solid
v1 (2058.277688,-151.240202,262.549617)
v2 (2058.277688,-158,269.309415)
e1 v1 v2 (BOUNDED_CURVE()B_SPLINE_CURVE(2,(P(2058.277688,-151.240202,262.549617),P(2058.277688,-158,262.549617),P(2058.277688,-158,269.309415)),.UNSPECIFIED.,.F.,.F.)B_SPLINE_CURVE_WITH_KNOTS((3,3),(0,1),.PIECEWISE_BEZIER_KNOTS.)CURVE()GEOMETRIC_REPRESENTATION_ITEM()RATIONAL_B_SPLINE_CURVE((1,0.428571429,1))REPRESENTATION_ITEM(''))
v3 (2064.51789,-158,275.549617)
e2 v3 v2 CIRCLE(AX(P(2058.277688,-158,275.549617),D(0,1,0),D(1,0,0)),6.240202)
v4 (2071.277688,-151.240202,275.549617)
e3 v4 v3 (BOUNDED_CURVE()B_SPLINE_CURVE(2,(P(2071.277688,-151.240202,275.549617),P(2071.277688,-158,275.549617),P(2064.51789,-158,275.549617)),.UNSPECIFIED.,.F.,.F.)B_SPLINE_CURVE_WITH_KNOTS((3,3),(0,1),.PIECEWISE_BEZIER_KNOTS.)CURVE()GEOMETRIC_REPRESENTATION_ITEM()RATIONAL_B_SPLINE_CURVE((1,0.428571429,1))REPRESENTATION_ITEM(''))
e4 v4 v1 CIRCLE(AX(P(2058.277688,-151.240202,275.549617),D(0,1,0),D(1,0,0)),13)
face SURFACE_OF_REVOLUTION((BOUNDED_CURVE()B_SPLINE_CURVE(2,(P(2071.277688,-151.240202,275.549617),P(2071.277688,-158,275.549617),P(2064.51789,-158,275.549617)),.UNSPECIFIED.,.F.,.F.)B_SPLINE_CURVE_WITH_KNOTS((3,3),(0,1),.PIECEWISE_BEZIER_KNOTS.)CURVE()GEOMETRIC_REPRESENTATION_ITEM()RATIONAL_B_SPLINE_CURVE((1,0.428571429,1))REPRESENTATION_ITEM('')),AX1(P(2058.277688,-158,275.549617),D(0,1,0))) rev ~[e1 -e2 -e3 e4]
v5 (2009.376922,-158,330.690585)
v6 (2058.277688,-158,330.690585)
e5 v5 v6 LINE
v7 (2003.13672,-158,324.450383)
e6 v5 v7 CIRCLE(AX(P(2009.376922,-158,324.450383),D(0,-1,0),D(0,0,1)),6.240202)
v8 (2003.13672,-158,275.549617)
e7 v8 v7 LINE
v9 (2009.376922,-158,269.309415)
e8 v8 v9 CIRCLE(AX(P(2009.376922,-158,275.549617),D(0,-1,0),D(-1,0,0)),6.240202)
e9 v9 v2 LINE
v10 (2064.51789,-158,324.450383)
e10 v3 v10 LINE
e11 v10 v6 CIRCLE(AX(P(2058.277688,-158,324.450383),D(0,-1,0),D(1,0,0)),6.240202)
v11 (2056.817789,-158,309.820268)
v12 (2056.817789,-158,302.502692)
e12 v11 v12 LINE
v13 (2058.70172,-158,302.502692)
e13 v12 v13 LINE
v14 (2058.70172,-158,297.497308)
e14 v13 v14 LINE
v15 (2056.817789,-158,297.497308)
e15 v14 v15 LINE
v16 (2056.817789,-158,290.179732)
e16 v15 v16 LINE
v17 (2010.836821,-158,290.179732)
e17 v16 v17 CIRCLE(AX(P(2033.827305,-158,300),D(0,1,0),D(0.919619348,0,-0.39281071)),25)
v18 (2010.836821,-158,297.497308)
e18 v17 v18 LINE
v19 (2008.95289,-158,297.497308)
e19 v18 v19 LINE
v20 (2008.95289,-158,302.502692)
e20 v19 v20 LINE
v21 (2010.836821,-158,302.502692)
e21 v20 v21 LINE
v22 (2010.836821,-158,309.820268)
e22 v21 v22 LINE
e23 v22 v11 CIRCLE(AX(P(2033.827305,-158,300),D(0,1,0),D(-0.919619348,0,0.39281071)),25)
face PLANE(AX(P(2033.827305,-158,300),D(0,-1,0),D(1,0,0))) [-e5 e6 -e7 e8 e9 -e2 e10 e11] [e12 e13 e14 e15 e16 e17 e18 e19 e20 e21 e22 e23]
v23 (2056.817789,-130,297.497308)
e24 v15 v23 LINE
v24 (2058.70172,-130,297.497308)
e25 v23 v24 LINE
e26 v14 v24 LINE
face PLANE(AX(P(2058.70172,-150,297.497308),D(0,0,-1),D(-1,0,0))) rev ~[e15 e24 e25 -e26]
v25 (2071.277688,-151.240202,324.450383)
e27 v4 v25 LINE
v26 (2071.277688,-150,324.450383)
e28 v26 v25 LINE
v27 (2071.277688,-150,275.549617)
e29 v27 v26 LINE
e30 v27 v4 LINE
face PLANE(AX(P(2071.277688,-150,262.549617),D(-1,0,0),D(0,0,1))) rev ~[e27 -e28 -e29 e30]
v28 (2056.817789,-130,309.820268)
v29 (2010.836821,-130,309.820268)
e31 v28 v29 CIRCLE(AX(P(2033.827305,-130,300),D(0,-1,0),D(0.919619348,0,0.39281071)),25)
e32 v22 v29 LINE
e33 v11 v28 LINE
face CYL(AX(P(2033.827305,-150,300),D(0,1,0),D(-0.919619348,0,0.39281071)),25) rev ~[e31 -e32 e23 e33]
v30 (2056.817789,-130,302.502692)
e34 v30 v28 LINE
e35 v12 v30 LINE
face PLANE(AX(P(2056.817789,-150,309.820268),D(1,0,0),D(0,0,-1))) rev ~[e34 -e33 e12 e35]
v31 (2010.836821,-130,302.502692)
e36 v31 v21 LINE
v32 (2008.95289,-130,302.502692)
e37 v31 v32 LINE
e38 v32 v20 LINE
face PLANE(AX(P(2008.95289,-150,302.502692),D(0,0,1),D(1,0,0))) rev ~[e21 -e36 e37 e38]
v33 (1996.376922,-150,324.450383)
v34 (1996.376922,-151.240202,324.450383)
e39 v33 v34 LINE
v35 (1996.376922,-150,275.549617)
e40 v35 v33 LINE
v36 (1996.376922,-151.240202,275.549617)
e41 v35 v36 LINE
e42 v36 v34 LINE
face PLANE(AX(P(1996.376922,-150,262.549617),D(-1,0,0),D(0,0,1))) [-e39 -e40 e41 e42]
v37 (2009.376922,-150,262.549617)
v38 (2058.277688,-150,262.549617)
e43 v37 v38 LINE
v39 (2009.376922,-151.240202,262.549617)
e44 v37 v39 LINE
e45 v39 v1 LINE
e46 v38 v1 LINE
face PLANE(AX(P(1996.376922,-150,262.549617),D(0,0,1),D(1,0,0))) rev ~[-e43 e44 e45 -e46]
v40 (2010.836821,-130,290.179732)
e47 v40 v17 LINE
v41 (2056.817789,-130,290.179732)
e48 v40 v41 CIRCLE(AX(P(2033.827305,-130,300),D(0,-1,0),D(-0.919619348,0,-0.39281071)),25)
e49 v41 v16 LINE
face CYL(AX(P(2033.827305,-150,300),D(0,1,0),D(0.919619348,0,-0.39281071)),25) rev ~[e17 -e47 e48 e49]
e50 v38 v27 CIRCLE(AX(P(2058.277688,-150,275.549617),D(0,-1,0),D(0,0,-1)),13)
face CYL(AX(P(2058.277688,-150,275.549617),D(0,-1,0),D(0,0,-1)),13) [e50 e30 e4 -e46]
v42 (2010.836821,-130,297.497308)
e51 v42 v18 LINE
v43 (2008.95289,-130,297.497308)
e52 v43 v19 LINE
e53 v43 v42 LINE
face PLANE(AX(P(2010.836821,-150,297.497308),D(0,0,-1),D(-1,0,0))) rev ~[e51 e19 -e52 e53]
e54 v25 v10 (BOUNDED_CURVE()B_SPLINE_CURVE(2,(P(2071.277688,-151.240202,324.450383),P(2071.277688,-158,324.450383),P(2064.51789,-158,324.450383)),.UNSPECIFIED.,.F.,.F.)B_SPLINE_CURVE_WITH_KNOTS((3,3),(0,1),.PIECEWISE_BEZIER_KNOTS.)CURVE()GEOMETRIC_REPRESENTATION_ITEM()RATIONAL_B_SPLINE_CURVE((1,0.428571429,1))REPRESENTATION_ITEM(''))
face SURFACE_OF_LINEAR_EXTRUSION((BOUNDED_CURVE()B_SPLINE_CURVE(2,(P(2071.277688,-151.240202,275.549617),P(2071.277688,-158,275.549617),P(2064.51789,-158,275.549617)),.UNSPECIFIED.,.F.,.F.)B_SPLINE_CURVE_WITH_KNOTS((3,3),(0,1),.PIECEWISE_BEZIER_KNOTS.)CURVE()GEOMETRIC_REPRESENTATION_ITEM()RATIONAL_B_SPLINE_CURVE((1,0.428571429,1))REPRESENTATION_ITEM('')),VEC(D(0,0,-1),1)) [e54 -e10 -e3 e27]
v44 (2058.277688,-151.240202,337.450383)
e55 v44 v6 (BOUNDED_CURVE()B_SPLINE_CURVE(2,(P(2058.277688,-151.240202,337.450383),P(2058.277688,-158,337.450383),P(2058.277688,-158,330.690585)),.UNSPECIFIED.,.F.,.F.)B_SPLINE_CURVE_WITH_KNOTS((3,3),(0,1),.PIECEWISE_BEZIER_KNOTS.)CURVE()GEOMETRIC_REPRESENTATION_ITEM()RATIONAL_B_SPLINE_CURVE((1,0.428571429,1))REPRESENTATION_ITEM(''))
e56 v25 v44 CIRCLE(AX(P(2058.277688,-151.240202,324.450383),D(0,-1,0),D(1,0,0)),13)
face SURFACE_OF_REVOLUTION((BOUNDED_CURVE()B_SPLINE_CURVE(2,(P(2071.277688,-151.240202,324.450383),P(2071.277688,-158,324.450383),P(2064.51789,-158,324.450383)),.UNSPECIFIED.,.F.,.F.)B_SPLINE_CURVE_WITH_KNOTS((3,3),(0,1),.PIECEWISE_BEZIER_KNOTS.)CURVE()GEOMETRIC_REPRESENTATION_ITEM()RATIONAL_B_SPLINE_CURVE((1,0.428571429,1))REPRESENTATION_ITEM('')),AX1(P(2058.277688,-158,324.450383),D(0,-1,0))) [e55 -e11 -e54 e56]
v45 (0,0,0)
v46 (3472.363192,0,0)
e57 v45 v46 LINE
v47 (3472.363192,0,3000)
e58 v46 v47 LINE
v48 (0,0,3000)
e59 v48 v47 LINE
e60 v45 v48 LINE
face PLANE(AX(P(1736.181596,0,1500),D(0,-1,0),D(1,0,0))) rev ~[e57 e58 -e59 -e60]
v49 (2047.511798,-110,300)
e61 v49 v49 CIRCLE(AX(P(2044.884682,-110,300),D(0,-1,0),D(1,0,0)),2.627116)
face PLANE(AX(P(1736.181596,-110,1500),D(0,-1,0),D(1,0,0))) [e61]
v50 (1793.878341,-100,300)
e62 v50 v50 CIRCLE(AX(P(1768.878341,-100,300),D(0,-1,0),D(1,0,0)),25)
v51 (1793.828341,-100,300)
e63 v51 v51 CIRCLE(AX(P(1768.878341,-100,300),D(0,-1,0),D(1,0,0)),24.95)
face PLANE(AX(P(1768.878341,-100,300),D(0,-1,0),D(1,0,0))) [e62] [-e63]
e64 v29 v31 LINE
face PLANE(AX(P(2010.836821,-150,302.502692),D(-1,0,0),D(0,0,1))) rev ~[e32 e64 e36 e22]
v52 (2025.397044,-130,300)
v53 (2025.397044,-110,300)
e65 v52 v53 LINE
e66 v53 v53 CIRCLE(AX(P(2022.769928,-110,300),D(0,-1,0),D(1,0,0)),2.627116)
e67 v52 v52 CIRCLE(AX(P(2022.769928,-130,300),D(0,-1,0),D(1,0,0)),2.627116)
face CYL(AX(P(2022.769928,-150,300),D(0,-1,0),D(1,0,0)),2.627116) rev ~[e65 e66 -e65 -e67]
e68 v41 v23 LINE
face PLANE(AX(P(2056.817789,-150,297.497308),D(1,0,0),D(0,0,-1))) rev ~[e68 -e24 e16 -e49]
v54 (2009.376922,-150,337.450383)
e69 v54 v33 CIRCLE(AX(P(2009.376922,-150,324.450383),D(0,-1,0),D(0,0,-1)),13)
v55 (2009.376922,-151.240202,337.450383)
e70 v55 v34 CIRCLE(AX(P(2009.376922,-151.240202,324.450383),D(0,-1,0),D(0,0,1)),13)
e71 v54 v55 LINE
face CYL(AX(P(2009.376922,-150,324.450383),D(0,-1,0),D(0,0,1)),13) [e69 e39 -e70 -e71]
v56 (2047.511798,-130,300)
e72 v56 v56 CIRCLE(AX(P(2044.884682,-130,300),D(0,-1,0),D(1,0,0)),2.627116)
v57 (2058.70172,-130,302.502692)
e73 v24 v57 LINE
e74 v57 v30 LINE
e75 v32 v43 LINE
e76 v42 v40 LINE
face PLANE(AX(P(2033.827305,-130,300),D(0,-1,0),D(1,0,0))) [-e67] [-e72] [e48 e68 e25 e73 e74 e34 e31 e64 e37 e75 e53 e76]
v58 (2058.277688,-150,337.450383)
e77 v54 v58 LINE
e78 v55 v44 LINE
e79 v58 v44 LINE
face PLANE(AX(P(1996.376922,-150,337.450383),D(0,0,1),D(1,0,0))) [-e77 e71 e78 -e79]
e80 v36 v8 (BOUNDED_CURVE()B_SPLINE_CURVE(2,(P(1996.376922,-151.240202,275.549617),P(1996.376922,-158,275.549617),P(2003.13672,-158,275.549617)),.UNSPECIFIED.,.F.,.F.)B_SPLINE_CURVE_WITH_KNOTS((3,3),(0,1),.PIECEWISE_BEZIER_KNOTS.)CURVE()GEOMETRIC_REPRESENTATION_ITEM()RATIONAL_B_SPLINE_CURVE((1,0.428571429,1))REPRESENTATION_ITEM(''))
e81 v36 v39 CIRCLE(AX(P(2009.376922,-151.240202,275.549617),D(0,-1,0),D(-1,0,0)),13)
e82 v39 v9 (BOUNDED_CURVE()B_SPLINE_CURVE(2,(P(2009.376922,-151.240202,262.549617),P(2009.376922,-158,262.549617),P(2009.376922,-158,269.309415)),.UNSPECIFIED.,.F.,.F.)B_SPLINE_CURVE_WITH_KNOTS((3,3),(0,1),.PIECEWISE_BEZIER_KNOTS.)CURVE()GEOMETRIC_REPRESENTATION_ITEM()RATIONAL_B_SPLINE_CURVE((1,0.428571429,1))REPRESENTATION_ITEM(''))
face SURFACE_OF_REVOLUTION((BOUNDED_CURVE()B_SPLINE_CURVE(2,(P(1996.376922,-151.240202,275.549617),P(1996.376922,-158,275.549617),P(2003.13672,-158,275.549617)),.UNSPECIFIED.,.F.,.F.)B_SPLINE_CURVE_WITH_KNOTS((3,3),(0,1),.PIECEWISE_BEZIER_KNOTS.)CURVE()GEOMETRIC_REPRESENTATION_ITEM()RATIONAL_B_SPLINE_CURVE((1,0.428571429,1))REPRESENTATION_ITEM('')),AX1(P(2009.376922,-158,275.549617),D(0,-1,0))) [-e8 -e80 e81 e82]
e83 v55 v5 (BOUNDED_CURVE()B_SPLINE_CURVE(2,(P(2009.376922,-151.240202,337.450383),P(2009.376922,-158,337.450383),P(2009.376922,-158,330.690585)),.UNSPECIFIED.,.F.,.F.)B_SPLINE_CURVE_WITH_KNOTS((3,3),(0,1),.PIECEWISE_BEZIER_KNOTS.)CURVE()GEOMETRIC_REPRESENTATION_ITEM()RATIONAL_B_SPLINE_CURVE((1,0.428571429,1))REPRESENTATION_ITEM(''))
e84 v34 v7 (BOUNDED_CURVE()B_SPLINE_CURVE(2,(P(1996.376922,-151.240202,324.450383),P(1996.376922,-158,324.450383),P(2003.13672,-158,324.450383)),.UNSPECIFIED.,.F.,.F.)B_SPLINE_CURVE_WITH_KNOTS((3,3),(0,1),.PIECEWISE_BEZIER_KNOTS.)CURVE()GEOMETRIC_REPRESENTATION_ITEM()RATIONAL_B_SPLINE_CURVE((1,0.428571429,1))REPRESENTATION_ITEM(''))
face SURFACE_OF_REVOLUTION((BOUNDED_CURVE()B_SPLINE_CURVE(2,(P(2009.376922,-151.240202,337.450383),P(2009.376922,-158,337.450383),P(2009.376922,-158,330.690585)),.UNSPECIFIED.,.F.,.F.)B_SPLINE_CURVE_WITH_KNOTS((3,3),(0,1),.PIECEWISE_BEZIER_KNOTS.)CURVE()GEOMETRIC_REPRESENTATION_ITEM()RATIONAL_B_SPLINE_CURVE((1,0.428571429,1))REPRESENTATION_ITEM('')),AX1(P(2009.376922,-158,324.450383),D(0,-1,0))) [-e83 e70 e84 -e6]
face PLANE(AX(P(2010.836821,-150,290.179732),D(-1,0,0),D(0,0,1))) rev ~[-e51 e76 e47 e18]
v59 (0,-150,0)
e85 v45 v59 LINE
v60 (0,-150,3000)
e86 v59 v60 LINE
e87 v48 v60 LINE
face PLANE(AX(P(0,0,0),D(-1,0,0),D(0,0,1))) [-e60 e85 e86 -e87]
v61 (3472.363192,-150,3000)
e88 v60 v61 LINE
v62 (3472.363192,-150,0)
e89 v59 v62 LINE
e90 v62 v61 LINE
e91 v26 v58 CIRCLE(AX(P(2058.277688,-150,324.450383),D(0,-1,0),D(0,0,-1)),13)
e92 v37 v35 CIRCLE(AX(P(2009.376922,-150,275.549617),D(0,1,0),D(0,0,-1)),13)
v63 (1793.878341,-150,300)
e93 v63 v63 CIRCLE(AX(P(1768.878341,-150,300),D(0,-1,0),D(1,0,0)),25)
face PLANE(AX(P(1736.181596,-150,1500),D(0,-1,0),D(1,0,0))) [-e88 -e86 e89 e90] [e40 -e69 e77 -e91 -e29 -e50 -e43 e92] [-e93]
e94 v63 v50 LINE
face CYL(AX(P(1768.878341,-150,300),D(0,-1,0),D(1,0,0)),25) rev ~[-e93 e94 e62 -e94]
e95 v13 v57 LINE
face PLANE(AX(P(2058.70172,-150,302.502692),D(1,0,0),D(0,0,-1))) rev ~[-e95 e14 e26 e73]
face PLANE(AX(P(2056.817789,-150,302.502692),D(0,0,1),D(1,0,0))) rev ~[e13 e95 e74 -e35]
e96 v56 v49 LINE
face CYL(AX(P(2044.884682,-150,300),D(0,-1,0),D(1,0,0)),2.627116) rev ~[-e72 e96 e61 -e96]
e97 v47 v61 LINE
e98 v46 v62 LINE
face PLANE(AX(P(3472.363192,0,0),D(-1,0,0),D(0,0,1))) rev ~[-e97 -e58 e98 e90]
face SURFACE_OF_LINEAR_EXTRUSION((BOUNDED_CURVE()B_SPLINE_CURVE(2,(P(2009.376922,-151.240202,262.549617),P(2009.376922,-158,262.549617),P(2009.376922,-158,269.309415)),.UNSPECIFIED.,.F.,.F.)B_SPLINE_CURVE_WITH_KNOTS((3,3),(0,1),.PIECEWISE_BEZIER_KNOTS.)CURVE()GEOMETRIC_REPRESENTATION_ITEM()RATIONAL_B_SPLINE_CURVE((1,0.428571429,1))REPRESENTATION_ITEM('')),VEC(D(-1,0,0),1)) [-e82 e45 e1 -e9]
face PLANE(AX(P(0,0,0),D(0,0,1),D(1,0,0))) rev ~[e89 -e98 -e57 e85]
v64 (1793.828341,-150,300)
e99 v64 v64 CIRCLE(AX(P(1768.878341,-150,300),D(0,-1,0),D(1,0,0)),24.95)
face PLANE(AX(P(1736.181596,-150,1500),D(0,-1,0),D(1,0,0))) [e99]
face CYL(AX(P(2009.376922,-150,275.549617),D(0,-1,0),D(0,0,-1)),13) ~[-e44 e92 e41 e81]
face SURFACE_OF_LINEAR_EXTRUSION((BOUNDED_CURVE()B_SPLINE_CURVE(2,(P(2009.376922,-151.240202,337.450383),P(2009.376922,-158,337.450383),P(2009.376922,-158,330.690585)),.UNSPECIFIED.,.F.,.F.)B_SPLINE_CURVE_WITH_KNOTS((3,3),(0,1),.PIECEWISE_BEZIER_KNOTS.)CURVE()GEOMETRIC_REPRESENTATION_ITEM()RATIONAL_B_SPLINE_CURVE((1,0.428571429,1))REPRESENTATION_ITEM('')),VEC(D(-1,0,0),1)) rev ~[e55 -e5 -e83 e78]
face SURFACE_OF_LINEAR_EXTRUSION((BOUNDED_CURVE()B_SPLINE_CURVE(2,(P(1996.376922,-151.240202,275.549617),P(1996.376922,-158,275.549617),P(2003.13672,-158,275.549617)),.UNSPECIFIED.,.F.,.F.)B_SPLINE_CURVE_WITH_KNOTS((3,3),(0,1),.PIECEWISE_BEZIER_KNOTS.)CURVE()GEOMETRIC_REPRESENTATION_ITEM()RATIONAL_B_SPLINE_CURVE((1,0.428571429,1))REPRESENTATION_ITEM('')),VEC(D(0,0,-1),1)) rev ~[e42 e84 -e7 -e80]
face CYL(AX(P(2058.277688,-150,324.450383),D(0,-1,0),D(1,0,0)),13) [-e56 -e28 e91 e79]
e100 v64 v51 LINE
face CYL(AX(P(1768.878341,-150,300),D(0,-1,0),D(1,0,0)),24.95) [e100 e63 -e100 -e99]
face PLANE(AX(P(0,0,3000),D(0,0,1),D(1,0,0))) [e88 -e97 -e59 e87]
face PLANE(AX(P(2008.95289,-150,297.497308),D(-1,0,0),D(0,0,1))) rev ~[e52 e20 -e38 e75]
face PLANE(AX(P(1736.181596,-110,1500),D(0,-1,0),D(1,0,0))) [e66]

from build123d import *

# Parameters (mm, degrees)
F0_W         = 3472.3631921678
F0_H         = 3000
F1_DEPTH     = 150
F2_R         = 25
F2_R_2       = 24.95
F3_DEPTH     = 50
F4_W         = 74.9007655587
F4_H         = 74.9007655587
F5_DEPTH     = 8
F6_R         = 13
F7_T1_DEPTH  = 48.9007655587
F7_T3_DEPTH  = 48.9007655587
F7_T6_ANGLE  = 90
F7_T8_ANGLE  = 90
F7_T10_ANGLE = 90
F7_T12_ANGLE = 90
F4_R         = 2.6271162968
F8_DEPTH     = 20
F9_DEPTH     = 40


# Not quite as in the source:
# - a fillet or chamfer that OpenCascade refuses, or shapes differently, is made with other operations: its cross-section is extruded or revolved along the edge and cut away or added


with BuildPart() as f1:
    # F0 (on Front) → F1 (new body)
    with BuildSketch(Plane.XZ):
        with Locations((1736.1815960839, 1500)):
            Rectangle(F0_W, F0_H)
    extrude(amount=F1_DEPTH)

    # F2 (on face) → F3 (cut)
    with BuildSketch(Plane.XZ.offset(150)):
        with Locations((1768.8783407211, 300)):
            Circle(F2_R)
        with Locations((1768.8783407211, 300)):
            Circle(F2_R_2, mode=Mode.SUBTRACT)
    extrude(amount=-F3_DEPTH, mode=Mode.SUBTRACT)

    # F4 (on face) → F5 (join)
    with BuildSketch(Plane.XZ.offset(150)):
        with Locations((2033.8273048401, 300)):
            Rectangle(F4_W, F4_H)
        with BuildLine():
            ThreePointArc((2056.8177885488, 290.179732242), (2033.8273048401, 275), (2010.8368211313, 290.179732242))
            Line((2010.8368211313, 290.179732242), (2010.8368211313, 297.4973082542))
            Line((2010.8368211313, 297.4973082542), (2008.9528895902, 297.4973082542))
            Line((2008.9528895902, 297.4973082542), (2008.9528895902, 302.5026917458))
            Line((2008.9528895902, 302.5026917458), (2010.8368211313, 302.5026917458))
            Line((2010.8368211313, 302.5026917458), (2010.8368211313, 309.820267758))
            ThreePointArc((2010.8368211313, 309.820267758), (2020.0524490141, 320.8627262594), (2033.8273048401, 325))
            ThreePointArc((2033.8273048401, 325), (2047.602160666, 320.8627262594), (2056.8177885488, 309.820267758))
            Line((2056.8177885488, 309.820267758), (2056.8177885488, 302.5026917458))
            Line((2056.8177885488, 302.5026917458), (2058.70172009, 302.5026917458))
            Line((2058.70172009, 302.5026917458), (2058.70172009, 297.4973082542))
            Line((2058.70172009, 297.4973082542), (2056.8177885488, 297.4973082542))
            Line((2056.8177885488, 297.4973082542), (2056.8177885488, 290.179732242))
        make_face(mode=Mode.SUBTRACT)
    extrude(amount=F5_DEPTH)

    # F6
    f6_edges = [f1.edges().sort_by_distance(p)[0] for p in [
        (1996.376922, -154, 337.450383),
        (1996.376922, -154, 262.549617),
        (2071.277688, -154, 262.549617),
        (2071.277688, -154, 337.450383),
    ]]
    fillet(f6_edges, radius=F6_R)

    # F7: fillet of radius 6.7597979746 on 8 edges, made by hand

    # F7_s2 → F7_t1 (cut)
    with BuildSketch(Plane.YZ.offset(2009.3769220608)):
        with BuildLine():
            add(Edge.make_bspline(
                [(-151.2402020254, 337.4503827793), (-158, 337.4503827793), (-158, 330.6905848047)],
                knots=[0, 0, 0, 1, 1, 1], degree=2, weights=[1, 0.4285714286, 1]))
            Line((-158, 330.6905848047), (-158, 337.4503827793))
            Line((-158, 337.4503827793), (-151.2402020254, 337.4503827793))
        make_face()
        with BuildLine():
            add(Edge.make_bspline(
                [(-151.2402020254, 262.5496172207), (-158, 262.5496172207), (-158, 269.3094151953)],
                knots=[0, 0, 0, 1, 1, 1], degree=2, weights=[1, 0.4285714286, 1]))
            Line((-158, 269.3094151953), (-158, 262.5496172207))
            Line((-158, 262.5496172207), (-151.2402020254, 262.5496172207))
        make_face()
    extrude(amount=F7_T1_DEPTH, mode=Mode.SUBTRACT)

    # F7_s4 → F7_t3 (cut)
    with BuildSketch(Plane.XY.offset(275.5496172207)):
        with BuildLine():
            add(Edge.make_bspline(
                [(2071.2776876194, -151.2402020254), (2071.2776876194, -158), (2064.5178896448, -158)],
                knots=[0, 0, 0, 1, 1, 1], degree=2, weights=[1, 0.4285714286, 1]))
            Line((2064.5178896448, -158), (2071.2776876194, -158))
            Line((2071.2776876194, -158), (2071.2776876194, -151.2402020254))
        make_face()
        with BuildLine():
            add(Edge.make_bspline(
                [(1996.3769220608, -151.2402020254), (1996.3769220608, -158), (2003.1367200354, -158)],
                knots=[0, 0, 0, 1, 1, 1], degree=2, weights=[1, 0.4285714286, 1]))
            Line((2003.1367200354, -158), (1996.3769220608, -158))
            Line((1996.3769220608, -158), (1996.3769220608, -151.2402020254))
        make_face()
    extrude(amount=F7_T3_DEPTH, mode=Mode.SUBTRACT)

    # F7_s5 → F7_t6 (revolve, cut)
    with BuildSketch(Plane.YZ.offset(2009.3769220608)):
        with BuildLine():
            add(Edge.make_bspline(
                [(-151.2402020254, 337.4503827793), (-158, 337.4503827793), (-158, 330.6905848047)],
                knots=[0, 0, 0, 1, 1, 1], degree=2, weights=[1, 0.4285714286, 1]))
            Line((-158, 330.6905848047), (-158, 337.4503827793))
            Line((-158, 337.4503827793), (-151.2402020254, 337.4503827793))
        make_face()
    revolve(axis=Axis((2009.3769220608, -158, 324.4503827793), (0, -1, 0)), revolution_arc=F7_T6_ANGLE, mode=Mode.SUBTRACT)

    # F7_s7 → F7_t8 (revolve, cut)
    with BuildSketch(Plane.XY.offset(324.4503827793)):
        with BuildLine():
            add(Edge.make_bspline(
                [(2071.2776876194, -151.2402020254), (2071.2776876194, -158), (2064.5178896448, -158)],
                knots=[0, 0, 0, 1, 1, 1], degree=2, weights=[1, 0.4285714286, 1]))
            Line((2064.5178896448, -158), (2071.2776876194, -158))
            Line((2071.2776876194, -158), (2071.2776876194, -151.2402020254))
        make_face()
    revolve(axis=Axis((2058.2776876194, -158, 324.4503827793), (0, -1, 0)), revolution_arc=F7_T8_ANGLE, mode=Mode.SUBTRACT)

    # F7_s9 → F7_t10 (revolve, cut)
    with BuildSketch(Plane.XY.offset(275.5496172207)):
        with BuildLine():
            add(Edge.make_bspline(
                [(2071.2776876194, -151.2402020254), (2071.2776876194, -158), (2064.5178896448, -158)],
                knots=[0, 0, 0, 1, 1, 1], degree=2, weights=[1, 0.4285714286, 1]))
            Line((2064.5178896448, -158), (2071.2776876194, -158))
            Line((2071.2776876194, -158), (2071.2776876194, -151.2402020254))
        make_face()
    revolve(axis=Axis((2058.2776876194, -158, 275.5496172207), (0, 1, 0)), revolution_arc=F7_T10_ANGLE, mode=Mode.SUBTRACT)

    # F7_s11 → F7_t12 (revolve, cut)
    with BuildSketch(Plane.XY.offset(275.5496172207)):
        with BuildLine():
            add(Edge.make_bspline(
                [(1996.3769220608, -151.2402020254), (1996.3769220608, -158), (2003.1367200354, -158)],
                knots=[0, 0, 0, 1, 1, 1], degree=2, weights=[1, 0.4285714286, 1]))
            Line((2003.1367200354, -158), (1996.3769220608, -158))
            Line((1996.3769220608, -158), (1996.3769220608, -151.2402020254))
        make_face()
    revolve(axis=Axis((2009.3769220608, -158, 275.5496172207), (0, -1, 0)), revolution_arc=F7_T12_ANGLE, mode=Mode.SUBTRACT)

    # F4 (on face) → F8 (cut)
    with BuildSketch(Plane.XZ.offset(150)):
        with BuildLine():
            Line((2010.8368211313, 297.4973082542), (2010.8368211313, 290.179732242))
            ThreePointArc((2010.8368211313, 290.179732242), (2033.8273048401, 275), (2056.8177885488, 290.179732242))
            Line((2056.8177885488, 290.179732242), (2056.8177885488, 297.4973082542))
            Line((2056.8177885488, 297.4973082542), (2058.70172009, 297.4973082542))
            Line((2058.70172009, 297.4973082542), (2058.70172009, 302.5026917458))
            Line((2058.70172009, 302.5026917458), (2056.8177885488, 302.5026917458))
            Line((2056.8177885488, 302.5026917458), (2056.8177885488, 309.820267758))
            ThreePointArc((2056.8177885488, 309.820267758), (2047.602160666, 320.8627262594), (2033.8273048401, 325))
            ThreePointArc((2033.8273048401, 325), (2020.0524490141, 320.8627262594), (2010.8368211313, 309.820267758))
            Line((2010.8368211313, 309.820267758), (2010.8368211313, 302.5026917458))
            Line((2010.8368211313, 302.5026917458), (2008.9528895902, 302.5026917458))
            Line((2008.9528895902, 302.5026917458), (2008.9528895902, 297.4973082542))
            Line((2008.9528895902, 297.4973082542), (2010.8368211313, 297.4973082542))
        make_face()
        with Locations((2022.7699279785, 300)):
            Circle(F4_R, mode=Mode.SUBTRACT)
        with Locations((2044.8846817017, 300)):
            Circle(F4_R, mode=Mode.SUBTRACT)
    extrude(amount=-F8_DEPTH, mode=Mode.SUBTRACT)

    # F9 (cut): faces of the model
    f9_faces = [f1.faces().sort_by_distance(p)[0] for p in [
        (2022.7699279785, -150, 300),
        (2044.8846817017, -150, 300),
    ]]
    extrude(f9_faces, amount=-F9_DEPTH, mode=Mode.SUBTRACT)


solid = f1.part
